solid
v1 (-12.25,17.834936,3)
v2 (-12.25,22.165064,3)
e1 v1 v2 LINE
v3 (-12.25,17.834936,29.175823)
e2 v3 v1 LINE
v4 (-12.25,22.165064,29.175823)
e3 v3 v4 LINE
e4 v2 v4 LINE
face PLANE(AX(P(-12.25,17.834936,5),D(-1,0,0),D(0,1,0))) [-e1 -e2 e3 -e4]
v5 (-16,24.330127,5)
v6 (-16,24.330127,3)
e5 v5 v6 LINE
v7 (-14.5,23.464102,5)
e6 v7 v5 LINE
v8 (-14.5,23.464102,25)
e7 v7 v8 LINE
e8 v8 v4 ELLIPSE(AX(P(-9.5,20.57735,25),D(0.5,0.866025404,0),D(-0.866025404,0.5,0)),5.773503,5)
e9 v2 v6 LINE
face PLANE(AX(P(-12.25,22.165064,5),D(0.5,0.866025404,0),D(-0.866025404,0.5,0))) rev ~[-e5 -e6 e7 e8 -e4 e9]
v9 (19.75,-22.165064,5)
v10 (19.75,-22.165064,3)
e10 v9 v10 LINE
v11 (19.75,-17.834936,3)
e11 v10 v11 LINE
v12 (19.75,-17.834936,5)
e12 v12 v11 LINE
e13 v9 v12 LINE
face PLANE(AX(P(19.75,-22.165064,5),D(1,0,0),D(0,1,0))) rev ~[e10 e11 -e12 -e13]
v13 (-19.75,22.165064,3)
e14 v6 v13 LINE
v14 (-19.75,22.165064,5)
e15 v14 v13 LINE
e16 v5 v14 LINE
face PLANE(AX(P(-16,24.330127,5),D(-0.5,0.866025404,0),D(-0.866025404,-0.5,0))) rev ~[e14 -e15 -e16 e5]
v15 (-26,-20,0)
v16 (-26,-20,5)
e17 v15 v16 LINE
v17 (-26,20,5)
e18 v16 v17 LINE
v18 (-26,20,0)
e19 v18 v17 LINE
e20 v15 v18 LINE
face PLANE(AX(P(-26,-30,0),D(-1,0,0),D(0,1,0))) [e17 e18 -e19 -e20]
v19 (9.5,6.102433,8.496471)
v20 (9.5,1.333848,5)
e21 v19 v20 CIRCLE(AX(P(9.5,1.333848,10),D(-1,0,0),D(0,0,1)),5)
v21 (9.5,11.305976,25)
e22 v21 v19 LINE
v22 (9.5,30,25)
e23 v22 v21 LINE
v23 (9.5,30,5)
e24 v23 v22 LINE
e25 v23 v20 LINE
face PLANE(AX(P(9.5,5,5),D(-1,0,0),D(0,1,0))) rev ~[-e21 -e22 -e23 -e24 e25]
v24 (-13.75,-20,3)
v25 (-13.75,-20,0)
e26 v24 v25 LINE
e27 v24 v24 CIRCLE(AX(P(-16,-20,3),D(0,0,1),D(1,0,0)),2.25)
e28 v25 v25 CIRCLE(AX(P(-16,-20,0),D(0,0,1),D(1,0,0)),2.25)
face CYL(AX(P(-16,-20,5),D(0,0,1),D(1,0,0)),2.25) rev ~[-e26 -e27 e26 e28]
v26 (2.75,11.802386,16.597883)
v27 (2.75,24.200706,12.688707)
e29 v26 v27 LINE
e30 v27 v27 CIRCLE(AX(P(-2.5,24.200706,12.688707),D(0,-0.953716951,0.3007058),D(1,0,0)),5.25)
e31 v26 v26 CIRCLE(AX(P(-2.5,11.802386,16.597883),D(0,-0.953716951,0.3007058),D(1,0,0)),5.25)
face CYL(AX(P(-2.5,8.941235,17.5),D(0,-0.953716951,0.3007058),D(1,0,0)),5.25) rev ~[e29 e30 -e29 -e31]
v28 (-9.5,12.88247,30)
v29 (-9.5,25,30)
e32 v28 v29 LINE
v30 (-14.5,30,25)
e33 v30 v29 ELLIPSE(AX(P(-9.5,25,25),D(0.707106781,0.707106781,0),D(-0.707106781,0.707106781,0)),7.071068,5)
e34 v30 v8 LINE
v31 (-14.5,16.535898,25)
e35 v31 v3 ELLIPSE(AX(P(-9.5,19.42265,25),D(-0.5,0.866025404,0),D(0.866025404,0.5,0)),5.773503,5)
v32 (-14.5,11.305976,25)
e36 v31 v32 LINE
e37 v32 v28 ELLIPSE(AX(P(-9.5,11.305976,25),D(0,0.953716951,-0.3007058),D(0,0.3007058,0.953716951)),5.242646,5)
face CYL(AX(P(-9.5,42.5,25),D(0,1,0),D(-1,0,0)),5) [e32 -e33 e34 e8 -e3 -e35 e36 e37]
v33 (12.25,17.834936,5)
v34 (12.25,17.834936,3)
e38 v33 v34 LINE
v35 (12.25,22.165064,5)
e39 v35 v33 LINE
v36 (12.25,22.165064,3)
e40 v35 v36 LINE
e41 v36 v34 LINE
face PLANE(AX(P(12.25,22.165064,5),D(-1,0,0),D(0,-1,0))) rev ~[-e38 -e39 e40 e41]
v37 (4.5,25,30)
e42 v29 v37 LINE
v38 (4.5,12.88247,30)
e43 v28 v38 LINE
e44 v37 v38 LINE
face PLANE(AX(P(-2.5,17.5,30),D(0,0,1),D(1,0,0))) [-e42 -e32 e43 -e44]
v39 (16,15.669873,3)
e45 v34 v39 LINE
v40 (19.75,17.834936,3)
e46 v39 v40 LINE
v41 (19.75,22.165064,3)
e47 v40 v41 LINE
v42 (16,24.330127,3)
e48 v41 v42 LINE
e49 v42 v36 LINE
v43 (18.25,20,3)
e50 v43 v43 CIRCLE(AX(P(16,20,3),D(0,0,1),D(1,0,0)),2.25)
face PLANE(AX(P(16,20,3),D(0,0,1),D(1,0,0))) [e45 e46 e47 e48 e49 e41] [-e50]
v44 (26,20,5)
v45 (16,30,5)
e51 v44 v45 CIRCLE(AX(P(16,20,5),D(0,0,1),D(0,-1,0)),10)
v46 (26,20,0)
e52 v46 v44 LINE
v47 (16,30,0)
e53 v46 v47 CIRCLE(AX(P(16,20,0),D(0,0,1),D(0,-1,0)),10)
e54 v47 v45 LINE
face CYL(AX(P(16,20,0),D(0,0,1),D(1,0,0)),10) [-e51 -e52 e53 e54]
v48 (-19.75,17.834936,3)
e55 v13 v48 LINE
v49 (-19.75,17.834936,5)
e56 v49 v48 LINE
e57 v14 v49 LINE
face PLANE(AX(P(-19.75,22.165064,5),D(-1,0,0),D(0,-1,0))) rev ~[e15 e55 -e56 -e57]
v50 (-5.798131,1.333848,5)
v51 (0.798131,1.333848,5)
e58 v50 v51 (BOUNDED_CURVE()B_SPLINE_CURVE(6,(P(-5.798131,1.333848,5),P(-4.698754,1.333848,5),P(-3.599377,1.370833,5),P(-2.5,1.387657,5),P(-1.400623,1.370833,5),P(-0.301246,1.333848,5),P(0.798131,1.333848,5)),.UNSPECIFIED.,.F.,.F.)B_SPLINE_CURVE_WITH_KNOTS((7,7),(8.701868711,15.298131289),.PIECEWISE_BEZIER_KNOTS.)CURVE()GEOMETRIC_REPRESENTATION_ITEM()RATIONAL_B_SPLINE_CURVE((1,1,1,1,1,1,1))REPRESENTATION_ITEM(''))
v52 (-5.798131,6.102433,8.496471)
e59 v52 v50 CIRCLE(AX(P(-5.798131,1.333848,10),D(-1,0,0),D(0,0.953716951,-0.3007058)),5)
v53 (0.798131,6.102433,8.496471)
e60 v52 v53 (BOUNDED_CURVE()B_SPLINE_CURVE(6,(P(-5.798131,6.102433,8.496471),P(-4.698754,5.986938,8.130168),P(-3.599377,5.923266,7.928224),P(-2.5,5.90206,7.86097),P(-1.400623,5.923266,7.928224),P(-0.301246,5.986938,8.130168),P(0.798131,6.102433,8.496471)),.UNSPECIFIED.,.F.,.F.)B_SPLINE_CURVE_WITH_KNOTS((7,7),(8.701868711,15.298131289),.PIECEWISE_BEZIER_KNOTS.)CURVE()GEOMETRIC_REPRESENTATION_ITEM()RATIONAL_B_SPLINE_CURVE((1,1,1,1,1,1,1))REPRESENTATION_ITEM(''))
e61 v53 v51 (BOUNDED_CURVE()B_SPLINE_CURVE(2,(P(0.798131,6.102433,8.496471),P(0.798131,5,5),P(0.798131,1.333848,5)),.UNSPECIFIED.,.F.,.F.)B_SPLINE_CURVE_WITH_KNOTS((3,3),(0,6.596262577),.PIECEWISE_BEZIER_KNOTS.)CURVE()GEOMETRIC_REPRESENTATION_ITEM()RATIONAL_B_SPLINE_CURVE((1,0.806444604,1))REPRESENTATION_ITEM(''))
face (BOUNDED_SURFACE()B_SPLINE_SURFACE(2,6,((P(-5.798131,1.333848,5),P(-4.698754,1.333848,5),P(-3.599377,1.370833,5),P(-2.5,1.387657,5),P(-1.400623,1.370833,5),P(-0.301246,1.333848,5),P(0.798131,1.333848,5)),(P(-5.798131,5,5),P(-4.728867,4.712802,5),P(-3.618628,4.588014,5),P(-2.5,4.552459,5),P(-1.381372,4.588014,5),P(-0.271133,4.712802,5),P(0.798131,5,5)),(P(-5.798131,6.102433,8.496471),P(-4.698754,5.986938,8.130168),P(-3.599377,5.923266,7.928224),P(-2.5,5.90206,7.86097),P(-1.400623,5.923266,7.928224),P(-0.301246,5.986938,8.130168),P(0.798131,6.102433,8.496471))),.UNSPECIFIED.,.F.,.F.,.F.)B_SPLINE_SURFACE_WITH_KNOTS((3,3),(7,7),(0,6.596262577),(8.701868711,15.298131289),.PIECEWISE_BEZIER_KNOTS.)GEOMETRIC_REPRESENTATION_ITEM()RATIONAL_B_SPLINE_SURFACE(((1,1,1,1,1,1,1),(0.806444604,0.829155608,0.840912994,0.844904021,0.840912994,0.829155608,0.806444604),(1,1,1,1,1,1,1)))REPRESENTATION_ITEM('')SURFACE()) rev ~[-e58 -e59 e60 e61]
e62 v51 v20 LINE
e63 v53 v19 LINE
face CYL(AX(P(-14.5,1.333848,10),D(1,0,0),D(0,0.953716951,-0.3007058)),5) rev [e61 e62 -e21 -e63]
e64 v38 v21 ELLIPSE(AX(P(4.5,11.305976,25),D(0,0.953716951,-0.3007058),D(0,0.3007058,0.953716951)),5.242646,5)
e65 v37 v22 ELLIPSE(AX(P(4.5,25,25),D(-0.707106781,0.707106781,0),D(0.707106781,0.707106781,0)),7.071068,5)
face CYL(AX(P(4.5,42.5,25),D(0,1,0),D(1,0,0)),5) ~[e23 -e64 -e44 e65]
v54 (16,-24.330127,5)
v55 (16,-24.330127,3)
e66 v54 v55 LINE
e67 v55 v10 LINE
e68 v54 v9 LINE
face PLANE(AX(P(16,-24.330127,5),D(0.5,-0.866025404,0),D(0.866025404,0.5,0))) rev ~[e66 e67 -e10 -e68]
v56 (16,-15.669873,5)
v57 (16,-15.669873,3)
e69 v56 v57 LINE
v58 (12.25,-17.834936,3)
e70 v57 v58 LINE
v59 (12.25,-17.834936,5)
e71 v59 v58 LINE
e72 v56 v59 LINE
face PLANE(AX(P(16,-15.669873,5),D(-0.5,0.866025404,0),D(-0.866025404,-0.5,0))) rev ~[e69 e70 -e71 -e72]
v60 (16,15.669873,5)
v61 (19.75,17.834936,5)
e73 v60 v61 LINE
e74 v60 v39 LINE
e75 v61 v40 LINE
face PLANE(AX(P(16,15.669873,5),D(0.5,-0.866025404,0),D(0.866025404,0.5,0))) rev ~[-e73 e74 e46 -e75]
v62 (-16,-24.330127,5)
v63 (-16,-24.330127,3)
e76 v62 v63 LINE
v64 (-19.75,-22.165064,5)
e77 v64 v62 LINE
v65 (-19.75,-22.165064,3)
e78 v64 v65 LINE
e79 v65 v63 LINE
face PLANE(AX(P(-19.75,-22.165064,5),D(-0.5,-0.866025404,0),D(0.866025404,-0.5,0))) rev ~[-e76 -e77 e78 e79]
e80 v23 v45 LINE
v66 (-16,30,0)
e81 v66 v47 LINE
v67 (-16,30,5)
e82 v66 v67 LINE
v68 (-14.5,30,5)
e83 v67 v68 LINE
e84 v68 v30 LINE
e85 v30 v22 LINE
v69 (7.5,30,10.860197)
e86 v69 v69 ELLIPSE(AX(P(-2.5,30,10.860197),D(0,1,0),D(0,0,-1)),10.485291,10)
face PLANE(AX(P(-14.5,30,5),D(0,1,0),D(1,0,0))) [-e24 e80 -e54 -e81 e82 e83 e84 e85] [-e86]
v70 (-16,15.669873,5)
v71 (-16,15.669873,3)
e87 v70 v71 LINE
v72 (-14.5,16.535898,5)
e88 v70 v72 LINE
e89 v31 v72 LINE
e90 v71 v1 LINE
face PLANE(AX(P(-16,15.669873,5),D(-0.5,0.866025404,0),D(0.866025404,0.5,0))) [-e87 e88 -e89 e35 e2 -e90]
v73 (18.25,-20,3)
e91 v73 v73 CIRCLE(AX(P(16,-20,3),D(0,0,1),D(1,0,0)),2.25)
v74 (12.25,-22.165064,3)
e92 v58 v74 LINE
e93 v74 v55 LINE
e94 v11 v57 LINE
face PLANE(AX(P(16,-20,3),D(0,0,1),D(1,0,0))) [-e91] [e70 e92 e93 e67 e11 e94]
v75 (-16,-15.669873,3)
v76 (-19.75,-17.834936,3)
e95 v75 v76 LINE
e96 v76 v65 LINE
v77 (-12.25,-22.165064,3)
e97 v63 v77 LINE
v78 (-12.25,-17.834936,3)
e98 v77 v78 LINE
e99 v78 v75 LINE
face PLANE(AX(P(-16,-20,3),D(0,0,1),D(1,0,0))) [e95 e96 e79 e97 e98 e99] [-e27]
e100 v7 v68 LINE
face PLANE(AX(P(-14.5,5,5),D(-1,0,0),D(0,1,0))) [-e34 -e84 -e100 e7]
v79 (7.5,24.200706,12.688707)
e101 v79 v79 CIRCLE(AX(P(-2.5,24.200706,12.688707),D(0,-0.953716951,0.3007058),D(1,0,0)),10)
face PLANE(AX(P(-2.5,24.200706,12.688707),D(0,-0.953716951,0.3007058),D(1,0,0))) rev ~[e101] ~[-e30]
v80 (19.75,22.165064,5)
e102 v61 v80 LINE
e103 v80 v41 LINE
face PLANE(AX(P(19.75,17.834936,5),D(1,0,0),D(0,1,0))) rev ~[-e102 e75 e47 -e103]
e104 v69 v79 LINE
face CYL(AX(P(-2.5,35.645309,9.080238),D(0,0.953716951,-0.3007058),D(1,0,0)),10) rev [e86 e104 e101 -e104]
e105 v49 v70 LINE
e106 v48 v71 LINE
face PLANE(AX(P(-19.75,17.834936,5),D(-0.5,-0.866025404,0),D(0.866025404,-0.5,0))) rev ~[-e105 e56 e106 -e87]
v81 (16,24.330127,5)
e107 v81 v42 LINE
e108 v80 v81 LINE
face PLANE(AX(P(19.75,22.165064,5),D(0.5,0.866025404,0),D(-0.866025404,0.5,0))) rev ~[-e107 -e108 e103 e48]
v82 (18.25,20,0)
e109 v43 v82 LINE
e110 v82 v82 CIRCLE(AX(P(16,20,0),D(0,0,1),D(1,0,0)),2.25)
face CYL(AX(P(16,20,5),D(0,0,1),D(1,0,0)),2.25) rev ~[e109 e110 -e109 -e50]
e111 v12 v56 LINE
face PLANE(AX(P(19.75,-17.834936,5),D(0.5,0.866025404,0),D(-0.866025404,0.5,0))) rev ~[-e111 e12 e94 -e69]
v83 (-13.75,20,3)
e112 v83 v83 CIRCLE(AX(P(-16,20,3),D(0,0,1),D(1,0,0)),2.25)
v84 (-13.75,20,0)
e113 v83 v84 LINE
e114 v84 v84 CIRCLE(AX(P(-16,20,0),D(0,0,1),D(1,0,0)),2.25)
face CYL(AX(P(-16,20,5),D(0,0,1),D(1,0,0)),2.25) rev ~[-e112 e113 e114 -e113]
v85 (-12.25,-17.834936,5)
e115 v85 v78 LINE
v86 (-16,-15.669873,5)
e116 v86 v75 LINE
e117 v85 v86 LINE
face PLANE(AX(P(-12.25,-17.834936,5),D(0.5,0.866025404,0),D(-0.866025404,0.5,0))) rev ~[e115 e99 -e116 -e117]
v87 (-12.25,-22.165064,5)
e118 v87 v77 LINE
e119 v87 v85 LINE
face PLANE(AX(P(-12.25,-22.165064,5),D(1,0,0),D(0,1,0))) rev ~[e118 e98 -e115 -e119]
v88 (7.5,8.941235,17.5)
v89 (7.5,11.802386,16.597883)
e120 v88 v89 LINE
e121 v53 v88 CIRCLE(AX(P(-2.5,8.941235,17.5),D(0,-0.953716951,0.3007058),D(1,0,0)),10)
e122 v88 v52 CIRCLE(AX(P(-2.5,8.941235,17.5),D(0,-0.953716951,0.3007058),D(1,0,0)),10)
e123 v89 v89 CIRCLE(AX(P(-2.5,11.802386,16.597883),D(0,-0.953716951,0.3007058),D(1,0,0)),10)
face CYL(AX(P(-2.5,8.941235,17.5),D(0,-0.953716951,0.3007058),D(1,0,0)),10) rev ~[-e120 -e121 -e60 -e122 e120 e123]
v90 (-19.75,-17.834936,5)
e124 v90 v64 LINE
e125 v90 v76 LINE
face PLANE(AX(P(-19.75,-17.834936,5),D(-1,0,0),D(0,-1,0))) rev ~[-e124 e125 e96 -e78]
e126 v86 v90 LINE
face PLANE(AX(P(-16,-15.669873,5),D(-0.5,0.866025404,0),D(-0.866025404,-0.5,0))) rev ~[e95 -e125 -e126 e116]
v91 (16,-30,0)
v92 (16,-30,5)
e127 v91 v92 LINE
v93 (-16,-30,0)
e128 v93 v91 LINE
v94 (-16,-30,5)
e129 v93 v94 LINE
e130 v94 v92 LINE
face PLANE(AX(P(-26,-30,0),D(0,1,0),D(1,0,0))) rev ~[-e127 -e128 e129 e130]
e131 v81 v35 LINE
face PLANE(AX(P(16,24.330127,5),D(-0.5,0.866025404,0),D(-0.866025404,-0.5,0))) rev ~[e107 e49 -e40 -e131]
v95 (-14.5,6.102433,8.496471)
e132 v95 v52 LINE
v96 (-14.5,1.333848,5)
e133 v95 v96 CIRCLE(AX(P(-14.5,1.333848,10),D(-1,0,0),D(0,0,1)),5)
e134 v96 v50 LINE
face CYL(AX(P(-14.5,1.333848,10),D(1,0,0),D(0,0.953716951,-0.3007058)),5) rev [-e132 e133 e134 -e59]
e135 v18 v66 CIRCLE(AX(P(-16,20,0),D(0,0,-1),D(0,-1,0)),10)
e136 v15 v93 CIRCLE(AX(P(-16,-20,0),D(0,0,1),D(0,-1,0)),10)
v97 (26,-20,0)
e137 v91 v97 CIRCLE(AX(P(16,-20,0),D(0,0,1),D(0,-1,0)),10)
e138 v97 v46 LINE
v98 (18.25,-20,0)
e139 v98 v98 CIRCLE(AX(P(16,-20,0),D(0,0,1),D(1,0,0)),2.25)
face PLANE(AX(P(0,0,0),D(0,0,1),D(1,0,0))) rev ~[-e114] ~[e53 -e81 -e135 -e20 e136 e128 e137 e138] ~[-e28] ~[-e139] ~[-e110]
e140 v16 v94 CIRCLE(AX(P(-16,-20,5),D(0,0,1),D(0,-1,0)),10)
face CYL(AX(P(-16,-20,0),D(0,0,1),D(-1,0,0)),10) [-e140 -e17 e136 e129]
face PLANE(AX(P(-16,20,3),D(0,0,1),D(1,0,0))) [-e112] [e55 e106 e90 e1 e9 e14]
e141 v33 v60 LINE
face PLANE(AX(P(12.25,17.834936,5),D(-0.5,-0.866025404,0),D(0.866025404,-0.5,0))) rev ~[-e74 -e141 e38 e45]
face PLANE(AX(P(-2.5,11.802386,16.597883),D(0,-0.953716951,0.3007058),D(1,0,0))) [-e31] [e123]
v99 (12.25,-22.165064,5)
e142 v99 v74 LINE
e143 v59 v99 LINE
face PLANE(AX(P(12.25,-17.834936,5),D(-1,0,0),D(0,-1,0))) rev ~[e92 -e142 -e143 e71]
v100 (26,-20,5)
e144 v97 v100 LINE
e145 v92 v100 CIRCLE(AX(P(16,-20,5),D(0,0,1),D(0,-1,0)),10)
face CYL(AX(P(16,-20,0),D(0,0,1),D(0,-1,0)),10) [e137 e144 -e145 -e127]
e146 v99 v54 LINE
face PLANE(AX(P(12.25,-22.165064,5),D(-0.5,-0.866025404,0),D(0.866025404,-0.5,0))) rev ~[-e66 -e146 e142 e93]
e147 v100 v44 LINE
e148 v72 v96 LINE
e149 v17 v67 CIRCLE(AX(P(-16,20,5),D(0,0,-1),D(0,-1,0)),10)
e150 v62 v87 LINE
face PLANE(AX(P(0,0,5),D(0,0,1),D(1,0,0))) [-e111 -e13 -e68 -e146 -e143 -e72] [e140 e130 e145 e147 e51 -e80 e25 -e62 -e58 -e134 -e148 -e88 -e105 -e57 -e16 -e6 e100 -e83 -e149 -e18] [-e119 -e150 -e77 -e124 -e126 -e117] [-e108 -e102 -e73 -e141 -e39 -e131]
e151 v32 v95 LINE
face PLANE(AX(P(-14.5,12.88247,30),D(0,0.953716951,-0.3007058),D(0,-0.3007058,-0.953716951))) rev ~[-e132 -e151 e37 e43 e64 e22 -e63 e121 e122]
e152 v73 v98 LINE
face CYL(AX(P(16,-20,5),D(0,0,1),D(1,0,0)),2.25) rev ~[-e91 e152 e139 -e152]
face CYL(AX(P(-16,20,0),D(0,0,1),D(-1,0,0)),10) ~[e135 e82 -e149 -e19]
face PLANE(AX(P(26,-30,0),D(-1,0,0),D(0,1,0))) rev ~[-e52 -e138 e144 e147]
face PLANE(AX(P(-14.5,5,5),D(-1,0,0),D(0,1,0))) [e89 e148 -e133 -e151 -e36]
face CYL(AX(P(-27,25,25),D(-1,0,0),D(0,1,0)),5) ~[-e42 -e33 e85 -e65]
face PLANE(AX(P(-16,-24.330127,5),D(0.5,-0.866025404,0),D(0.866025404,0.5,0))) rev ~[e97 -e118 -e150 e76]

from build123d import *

# Parameters (mm, degrees)
F0_W         = 52
F0_H         = 60
F1_DEPTH     = 5
F2_R         = 10
F3_R         = 2.25
F4_DEPTH     = 25
F6_DEPTH     = 2
F7_W         = 24
F7_H         = 25
F8_DEPTH     = 25
F10_DEPTH    = 40.501
F11_R        = 5.25
F12_DEPTH    = 25.3474527662
F13_R        = 10
F13_R_2      = 5.25
F14_DEPTH    = 3
F16_R        = 10
F17_DEPTH    = 12
F18_DEPTH    = 25.001
F19_F1_R     = 5
F19_T2_DEPTH = 31.5358983849
F19_T4_DEPTH = 28.6534286629
F19_T6_DEPTH = 42.117530278
F19_T8_DEPTH = 49


# Not quite as in the source:
# - a fillet or chamfer that OpenCascade refuses, or shapes differently, is made with other operations: its cross-section is extruded or revolved along the edge and cut away or added


with BuildPart() as f1:
    # F0 (on Top) → F1 (new body)
    with BuildSketch(Plane.XY):
        Rectangle(F0_W, F0_H)
    extrude(amount=F1_DEPTH)

    # F2
    f2_edges = [f1.edges().sort_by_distance(p)[0] for p in [
        (26, -30, 2.5),
        (-26, -30, 2.5),
        (26, 30, 2.5),
        (-26, 30, 2.5),
    ]]
    fillet(f2_edges, radius=F2_R)

    # F3 (on face) → F4 (cut)
    with BuildSketch(Plane.XY.offset(5)):
        with Locations((-16, -20)):
            Circle(F3_R)
        with Locations((16, -20)):
            Circle(F3_R)
        with Locations((-16, 20)):
            Circle(F3_R)
        with Locations((16, 20)):
            Circle(F3_R)
    extrude(amount=-F4_DEPTH, mode=Mode.SUBTRACT)

    # F5 (on face) → F6 (cut)
    with BuildSketch(Plane.XY.offset(5)):
        Polygon((-16, -15.6698729811), (-19.75, -17.8349364905), (-19.75, -22.1650635095), (-16, -24.3301270189), (-12.25, -22.1650635095), (-12.25, -17.8349364905), align=None)
        Polygon((-12.25, 22.1650635095), (-16, 24.3301270189), (-19.75, 22.1650635095), (-19.75, 17.8349364905), (-16, 15.6698729811), (-12.25, 17.8349364905), align=None)
        Polygon((19.75, -17.8349364905), (16, -15.6698729811), (12.25, -17.8349364905), (12.25, -22.1650635095), (16, -24.3301270189), (19.75, -22.1650635095), align=None)
        Polygon((19.75, 22.1650635095), (16, 24.3301270189), (12.25, 22.1650635095), (12.25, 17.8349364905), (16, 15.6698729811), (19.75, 17.8349364905), align=None)
    extrude(amount=-F6_DEPTH, mode=Mode.SUBTRACT)

    # F7 (on face) → F8 (join)
    with BuildSketch(Plane.XY.offset(5)):
        with Locations((-2.5, 17.5)):
            Rectangle(F7_W, F7_H)
    extrude(amount=F8_DEPTH)

    # F9 (on face) → F10 (cut, through all)
    with BuildSketch(Plane(origin=(-14.5, 0, 0), x_dir=(0, -1, 0), z_dir=(-1, 0, 0))):
        Polygon((-12.882469722, 30), (-5, 5), (-5, 30), align=None)
    extrude(amount=-F10_DEPTH, mode=Mode.SUBTRACT)

    # F11 (on face) → F12 (cut, through all)
    with BuildSketch(Plane(origin=(0, 3.1139390198, -0.9818212016), x_dir=(1, 0, 0), z_dir=(0, -0.9537169507, 0.3007057995))):
        with Locations((-2.5, 19.3787278155)):
            Circle(F11_R)
    extrude(amount=-F12_DEPTH, mode=Mode.SUBTRACT)

    # F13 (on face) → F14 (cut)
    with BuildSketch(Plane(origin=(0, 3.1139390198, -0.9818212016), x_dir=(1, 0, 0), z_dir=(0, -0.9537169507, 0.3007057995))):
        with Locations((-2.5, 19.3787278155)):
            Circle(F13_R)
        with Locations((-2.5, 19.3787278155)):
            Circle(F13_R_2, mode=Mode.SUBTRACT)
    extrude(amount=-F14_DEPTH, mode=Mode.SUBTRACT)

    # F16 (on offset) → F17 (cut)
    with BuildSketch(Plane(origin=(0, 29.8180136408, -9.4015835877), x_dir=(1, 0, 0), z_dir=(0, -0.9537169507, 0.3007057995))):
        with Locations((-2.5, 19.3787278155)):
            Circle(F16_R)
    extrude(amount=F17_DEPTH, mode=Mode.SUBTRACT)

    # F5 (on face) → F18 (cut, through all)
    with BuildSketch(Plane.XY.offset(5)):
        Polygon((-16, -15.6698729811), (-19.75, -17.8349364905), (-19.75, -22.1650635095), (-16, -24.3301270189), (-12.25, -22.1650635095), (-12.25, -17.8349364905), align=None)
        Polygon((-12.25, 22.1650635095), (-16, 24.3301270189), (-19.75, 22.1650635095), (-19.75, 17.8349364905), (-16, 15.6698729811), (-12.25, 17.8349364905), align=None)
        Polygon((19.75, -17.8349364905), (16, -15.6698729811), (12.25, -17.8349364905), (12.25, -22.1650635095), (16, -24.3301270189), (19.75, -22.1650635095), align=None)
        Polygon((19.75, 22.1650635095), (16, 24.3301270189), (12.25, 22.1650635095), (12.25, 17.8349364905), (16, 15.6698729811), (19.75, 17.8349364905), align=None)
    extrude(amount=F18_DEPTH, mode=Mode.SUBTRACT)

    # F19: fillet of radius 5 on 5 edges, made by hand

    # F19_f1
    f19_f1_edges = [f1.edges().sort_by_distance(p)[0] for p in [
        (-2.5, 5, 5),
    ]]
    fillet(f19_f1_edges, radius=F19_F1_R)

    # F19_s3 → F19_t2 (cut)
    with BuildSketch(Plane.XZ.offset(-42.5)):
        with BuildLine():
            ThreePointArc((-14.5, 25), (-13.0355339059, 28.5355339059), (-9.5, 30))
            Line((-9.5, 30), (-9.5, 30.1))
            Line((-9.5, 30.1), (-14.6, 30.1))
            Line((-14.6, 30.1), (-14.6, 25))
            Line((-14.6, 25), (-14.5, 25))
        make_face()
    extrude(amount=F19_T2_DEPTH, mode=Mode.SUBTRACT)

    # F19_s5 → F19_t4 (cut)
    with BuildSketch(Plane.XZ.offset(-29.0358983849)):
        with BuildLine():
            ThreePointArc((-14.5, 25), (-13.0355339059, 28.5355339059), (-9.5, 30))
            Line((-9.5, 30), (-9.5, 30.1))
            Line((-9.5, 30.1), (-14.6, 30.1))
            Line((-14.6, 30.1), (-14.6, 25))
            Line((-14.6, 25), (-14.5, 25))
        make_face()
    extrude(amount=F19_T4_DEPTH, mode=Mode.SUBTRACT)

    # F19_s7 → F19_t6 (cut)
    with BuildSketch(Plane.XZ.offset(-42.5)):
        with BuildLine():
            ThreePointArc((9.5, 25), (8.0355339059, 28.5355339059), (4.5, 30))
            Line((4.5, 30), (4.5, 30.1))
            Line((4.5, 30.1), (9.6, 30.1))
            Line((9.6, 30.1), (9.6, 25))
            Line((9.6, 25), (9.5, 25))
        make_face()
    extrude(amount=F19_T6_DEPTH, mode=Mode.SUBTRACT)

    # F19_s9 → F19_t8 (cut)
    with BuildSketch(Plane.YZ.offset(-27)):
        with BuildLine():
            ThreePointArc((30, 25), (28.5355339059, 28.5355339059), (25, 30))
            Line((25, 30), (25, 30.1))
            Line((25, 30.1), (30.1, 30.1))
            Line((30.1, 30.1), (30.1, 25))
            Line((30.1, 25), (30, 25))
        make_face()
    extrude(amount=F19_T8_DEPTH, mode=Mode.SUBTRACT)


solid = f1.part
